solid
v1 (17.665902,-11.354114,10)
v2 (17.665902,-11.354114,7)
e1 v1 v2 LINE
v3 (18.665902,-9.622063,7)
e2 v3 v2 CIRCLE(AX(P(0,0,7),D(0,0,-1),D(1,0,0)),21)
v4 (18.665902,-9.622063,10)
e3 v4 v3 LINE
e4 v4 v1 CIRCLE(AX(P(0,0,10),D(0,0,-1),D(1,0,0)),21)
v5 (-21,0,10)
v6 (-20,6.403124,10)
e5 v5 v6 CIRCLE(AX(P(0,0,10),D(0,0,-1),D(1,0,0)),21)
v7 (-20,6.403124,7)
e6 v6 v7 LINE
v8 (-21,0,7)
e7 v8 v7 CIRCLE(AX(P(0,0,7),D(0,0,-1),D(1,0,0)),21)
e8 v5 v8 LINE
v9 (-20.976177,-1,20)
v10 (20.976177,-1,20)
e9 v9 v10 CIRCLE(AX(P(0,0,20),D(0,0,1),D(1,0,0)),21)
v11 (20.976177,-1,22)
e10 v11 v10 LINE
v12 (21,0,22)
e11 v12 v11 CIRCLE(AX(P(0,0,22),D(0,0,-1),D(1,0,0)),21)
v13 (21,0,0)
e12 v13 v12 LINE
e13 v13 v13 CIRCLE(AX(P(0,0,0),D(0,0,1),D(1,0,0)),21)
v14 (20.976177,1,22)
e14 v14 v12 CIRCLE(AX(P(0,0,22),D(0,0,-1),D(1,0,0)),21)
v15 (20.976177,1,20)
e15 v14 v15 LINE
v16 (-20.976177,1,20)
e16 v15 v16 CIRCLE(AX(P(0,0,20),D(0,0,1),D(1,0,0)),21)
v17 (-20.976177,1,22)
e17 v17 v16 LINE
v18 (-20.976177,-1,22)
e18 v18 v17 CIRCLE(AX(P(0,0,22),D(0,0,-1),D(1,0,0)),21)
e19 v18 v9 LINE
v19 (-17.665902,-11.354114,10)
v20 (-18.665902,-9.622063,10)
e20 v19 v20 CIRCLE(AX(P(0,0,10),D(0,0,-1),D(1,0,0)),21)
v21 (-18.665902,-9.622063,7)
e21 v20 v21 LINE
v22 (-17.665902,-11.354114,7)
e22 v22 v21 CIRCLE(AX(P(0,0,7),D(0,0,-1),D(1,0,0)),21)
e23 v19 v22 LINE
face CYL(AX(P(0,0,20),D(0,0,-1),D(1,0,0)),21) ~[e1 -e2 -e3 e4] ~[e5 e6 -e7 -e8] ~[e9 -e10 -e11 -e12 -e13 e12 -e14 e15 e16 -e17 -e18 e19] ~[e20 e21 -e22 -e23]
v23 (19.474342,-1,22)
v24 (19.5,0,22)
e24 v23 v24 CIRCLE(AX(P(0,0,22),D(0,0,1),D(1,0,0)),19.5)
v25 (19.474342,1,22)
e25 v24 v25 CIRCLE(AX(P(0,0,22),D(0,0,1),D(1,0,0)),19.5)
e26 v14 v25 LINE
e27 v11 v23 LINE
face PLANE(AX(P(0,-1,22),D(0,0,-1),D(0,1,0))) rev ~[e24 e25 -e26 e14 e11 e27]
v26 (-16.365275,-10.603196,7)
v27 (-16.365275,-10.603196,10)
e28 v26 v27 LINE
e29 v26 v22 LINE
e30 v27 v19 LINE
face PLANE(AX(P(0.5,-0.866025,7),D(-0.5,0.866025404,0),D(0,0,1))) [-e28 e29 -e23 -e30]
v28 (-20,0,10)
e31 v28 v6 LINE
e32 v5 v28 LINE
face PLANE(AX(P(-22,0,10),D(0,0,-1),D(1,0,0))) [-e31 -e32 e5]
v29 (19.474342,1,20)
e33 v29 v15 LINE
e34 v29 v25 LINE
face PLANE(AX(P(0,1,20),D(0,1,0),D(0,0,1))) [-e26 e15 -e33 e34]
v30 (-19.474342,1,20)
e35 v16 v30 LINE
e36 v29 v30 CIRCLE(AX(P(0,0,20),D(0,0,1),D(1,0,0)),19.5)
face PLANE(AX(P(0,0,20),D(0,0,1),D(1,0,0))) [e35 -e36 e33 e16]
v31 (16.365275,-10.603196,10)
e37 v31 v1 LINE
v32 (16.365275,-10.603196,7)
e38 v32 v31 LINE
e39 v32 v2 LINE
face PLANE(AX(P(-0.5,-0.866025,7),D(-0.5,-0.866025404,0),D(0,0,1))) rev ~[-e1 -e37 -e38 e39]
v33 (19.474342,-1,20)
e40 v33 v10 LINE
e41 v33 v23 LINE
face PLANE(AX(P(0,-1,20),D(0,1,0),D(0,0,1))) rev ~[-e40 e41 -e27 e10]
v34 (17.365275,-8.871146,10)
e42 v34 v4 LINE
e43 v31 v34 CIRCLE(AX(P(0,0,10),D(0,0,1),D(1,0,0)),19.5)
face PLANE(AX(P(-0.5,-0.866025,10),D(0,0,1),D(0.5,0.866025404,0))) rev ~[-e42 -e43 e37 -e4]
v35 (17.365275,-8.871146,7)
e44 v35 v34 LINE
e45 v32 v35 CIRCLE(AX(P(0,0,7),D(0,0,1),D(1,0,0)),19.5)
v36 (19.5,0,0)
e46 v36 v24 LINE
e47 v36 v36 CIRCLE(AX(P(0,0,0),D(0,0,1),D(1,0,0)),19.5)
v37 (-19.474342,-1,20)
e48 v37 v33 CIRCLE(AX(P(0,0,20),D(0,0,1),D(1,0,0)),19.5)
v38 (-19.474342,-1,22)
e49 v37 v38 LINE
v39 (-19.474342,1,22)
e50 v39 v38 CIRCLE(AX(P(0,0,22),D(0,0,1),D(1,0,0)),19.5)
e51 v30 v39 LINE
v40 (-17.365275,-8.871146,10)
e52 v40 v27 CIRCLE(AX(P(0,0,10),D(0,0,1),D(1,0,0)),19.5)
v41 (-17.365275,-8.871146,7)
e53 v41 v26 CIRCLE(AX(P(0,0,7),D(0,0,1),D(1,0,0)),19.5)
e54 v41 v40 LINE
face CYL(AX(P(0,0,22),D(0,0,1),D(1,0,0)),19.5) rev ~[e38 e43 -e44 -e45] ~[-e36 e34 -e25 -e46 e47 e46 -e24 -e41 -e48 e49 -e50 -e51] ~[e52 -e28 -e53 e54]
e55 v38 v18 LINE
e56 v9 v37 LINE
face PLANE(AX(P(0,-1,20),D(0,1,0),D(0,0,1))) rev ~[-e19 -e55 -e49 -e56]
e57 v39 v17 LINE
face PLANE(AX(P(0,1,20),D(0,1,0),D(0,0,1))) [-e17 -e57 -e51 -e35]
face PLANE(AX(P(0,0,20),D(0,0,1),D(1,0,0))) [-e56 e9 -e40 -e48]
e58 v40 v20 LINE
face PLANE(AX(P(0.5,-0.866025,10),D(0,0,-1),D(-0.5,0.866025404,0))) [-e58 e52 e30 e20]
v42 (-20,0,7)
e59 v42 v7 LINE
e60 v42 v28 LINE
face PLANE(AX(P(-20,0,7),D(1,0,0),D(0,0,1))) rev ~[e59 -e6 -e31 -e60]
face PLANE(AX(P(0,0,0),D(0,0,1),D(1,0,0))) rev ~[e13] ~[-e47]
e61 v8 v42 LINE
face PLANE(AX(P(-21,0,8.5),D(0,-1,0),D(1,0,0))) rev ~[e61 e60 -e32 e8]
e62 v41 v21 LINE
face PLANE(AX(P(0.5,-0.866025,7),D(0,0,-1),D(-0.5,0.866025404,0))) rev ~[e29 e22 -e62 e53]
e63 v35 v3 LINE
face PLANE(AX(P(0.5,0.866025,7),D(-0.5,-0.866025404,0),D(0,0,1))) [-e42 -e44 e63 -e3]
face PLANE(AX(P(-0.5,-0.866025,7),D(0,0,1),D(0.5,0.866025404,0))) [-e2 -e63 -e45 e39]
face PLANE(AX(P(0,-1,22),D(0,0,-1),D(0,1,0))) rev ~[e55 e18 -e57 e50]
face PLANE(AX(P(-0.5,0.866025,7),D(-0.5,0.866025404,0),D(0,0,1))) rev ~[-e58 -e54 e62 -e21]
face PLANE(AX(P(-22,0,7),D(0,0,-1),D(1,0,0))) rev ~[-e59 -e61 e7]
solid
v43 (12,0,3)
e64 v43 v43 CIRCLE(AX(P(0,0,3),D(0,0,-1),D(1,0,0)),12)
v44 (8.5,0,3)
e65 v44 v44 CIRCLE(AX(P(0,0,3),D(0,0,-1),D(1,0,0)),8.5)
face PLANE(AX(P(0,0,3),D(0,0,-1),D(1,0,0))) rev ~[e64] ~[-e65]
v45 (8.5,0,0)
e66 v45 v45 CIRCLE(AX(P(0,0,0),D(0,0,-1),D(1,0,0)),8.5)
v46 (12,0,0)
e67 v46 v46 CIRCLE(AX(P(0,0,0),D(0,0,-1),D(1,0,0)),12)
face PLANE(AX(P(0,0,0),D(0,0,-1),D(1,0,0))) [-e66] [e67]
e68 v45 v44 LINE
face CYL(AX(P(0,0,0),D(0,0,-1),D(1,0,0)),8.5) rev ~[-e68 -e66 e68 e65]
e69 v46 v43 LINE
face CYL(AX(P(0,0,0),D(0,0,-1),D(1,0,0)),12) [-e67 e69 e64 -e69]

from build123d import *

# Parameters (mm, degrees)
F0_R      = 21
F0_R_2    = 19.5
F1_DEPTH  = 20
F2_W      = 2
F2_H      = 2
F3_DEPTH  = 25
F4_R      = 19.5
F5_DEPTH  = 25
F6_R      = 25.0510774743
F6_R_2    = 21
F7_DEPTH  = 2.001
F8_R      = 12
F8_R_2    = 8.5
F9_DEPTH  = 3
F16_W     = 2
F16_H     = 3
F17_DEPTH = 21.001
F18_W     = 2
F18_H     = 3
F19_DEPTH = 28.6875334795
F20_W     = 2
F20_H     = 3
F21_DEPTH = 28.6875334795


# Not quite as in the source:
# - a feature of the source that left no trace in its solid (it failed there, or was rolled back) is left out


with BuildPart() as f1:
    # F0 (on Top) → F1 (new body)
    with BuildSketch(Plane.XY):
        Circle(F0_R)
        Circle(F0_R_2, mode=Mode.SUBTRACT)
    extrude(amount=F1_DEPTH)

    # F2 (on Right) → F3 (join, symmetric)
    with BuildSketch(Plane.YZ):
        with Locations((0, 21)):
            Rectangle(F2_W, F2_H)
    extrude(amount=F3_DEPTH, both=True)

    # F4 (on face) → F5 (cut)
    with BuildSketch(Plane.XY.offset(22)):
        Circle(F4_R)
    extrude(amount=-F5_DEPTH, mode=Mode.SUBTRACT)

    # F6 (on face) → F7 (cut, through all)
    with BuildSketch(Plane.XY.offset(20)):
        Circle(F6_R)
        Circle(F6_R_2, mode=Mode.SUBTRACT)
    extrude(amount=F7_DEPTH, mode=Mode.SUBTRACT)

    # F16 (on Front) → F17 (cut, through all)
    with BuildSketch(Plane.XZ):
        with Locations((-21, 8.5)):
            Rectangle(F16_W, F16_H)
    extrude(amount=-F17_DEPTH, mode=Mode.SUBTRACT)

    # F18 (on face) → F19 (cut, through all)
    with BuildSketch(Plane(origin=(0, 0, 0), x_dir=(0.5, 0.8660254038, 0), z_dir=(0.8660254038, -0.5, 0))):
        with Locations((0, 8.5)):
            Rectangle(F18_W, F18_H)
    extrude(amount=F19_DEPTH, mode=Mode.SUBTRACT)

    # F20 (on face) → F21 (cut, through all)
    with BuildSketch(Plane(origin=(0, 0, 0), x_dir=(-0.5, 0.8660254038, 0), z_dir=(0.8660254038, 0.5, 0))):
        with Locations((0, 8.5)):
            Rectangle(F20_W, F20_H)
    extrude(amount=-F21_DEPTH, mode=Mode.SUBTRACT)


with BuildPart() as f9:
    # F8 (on face) → F9 (new body)
    with BuildSketch(Plane(origin=(0, 0, 0), x_dir=(1, 0, 0), z_dir=(0, 0, -1))):
        Circle(F8_R)
        Circle(F8_R_2, mode=Mode.SUBTRACT)
    extrude(amount=-F9_DEPTH)


solid = Compound([f1.part, f9.part])
